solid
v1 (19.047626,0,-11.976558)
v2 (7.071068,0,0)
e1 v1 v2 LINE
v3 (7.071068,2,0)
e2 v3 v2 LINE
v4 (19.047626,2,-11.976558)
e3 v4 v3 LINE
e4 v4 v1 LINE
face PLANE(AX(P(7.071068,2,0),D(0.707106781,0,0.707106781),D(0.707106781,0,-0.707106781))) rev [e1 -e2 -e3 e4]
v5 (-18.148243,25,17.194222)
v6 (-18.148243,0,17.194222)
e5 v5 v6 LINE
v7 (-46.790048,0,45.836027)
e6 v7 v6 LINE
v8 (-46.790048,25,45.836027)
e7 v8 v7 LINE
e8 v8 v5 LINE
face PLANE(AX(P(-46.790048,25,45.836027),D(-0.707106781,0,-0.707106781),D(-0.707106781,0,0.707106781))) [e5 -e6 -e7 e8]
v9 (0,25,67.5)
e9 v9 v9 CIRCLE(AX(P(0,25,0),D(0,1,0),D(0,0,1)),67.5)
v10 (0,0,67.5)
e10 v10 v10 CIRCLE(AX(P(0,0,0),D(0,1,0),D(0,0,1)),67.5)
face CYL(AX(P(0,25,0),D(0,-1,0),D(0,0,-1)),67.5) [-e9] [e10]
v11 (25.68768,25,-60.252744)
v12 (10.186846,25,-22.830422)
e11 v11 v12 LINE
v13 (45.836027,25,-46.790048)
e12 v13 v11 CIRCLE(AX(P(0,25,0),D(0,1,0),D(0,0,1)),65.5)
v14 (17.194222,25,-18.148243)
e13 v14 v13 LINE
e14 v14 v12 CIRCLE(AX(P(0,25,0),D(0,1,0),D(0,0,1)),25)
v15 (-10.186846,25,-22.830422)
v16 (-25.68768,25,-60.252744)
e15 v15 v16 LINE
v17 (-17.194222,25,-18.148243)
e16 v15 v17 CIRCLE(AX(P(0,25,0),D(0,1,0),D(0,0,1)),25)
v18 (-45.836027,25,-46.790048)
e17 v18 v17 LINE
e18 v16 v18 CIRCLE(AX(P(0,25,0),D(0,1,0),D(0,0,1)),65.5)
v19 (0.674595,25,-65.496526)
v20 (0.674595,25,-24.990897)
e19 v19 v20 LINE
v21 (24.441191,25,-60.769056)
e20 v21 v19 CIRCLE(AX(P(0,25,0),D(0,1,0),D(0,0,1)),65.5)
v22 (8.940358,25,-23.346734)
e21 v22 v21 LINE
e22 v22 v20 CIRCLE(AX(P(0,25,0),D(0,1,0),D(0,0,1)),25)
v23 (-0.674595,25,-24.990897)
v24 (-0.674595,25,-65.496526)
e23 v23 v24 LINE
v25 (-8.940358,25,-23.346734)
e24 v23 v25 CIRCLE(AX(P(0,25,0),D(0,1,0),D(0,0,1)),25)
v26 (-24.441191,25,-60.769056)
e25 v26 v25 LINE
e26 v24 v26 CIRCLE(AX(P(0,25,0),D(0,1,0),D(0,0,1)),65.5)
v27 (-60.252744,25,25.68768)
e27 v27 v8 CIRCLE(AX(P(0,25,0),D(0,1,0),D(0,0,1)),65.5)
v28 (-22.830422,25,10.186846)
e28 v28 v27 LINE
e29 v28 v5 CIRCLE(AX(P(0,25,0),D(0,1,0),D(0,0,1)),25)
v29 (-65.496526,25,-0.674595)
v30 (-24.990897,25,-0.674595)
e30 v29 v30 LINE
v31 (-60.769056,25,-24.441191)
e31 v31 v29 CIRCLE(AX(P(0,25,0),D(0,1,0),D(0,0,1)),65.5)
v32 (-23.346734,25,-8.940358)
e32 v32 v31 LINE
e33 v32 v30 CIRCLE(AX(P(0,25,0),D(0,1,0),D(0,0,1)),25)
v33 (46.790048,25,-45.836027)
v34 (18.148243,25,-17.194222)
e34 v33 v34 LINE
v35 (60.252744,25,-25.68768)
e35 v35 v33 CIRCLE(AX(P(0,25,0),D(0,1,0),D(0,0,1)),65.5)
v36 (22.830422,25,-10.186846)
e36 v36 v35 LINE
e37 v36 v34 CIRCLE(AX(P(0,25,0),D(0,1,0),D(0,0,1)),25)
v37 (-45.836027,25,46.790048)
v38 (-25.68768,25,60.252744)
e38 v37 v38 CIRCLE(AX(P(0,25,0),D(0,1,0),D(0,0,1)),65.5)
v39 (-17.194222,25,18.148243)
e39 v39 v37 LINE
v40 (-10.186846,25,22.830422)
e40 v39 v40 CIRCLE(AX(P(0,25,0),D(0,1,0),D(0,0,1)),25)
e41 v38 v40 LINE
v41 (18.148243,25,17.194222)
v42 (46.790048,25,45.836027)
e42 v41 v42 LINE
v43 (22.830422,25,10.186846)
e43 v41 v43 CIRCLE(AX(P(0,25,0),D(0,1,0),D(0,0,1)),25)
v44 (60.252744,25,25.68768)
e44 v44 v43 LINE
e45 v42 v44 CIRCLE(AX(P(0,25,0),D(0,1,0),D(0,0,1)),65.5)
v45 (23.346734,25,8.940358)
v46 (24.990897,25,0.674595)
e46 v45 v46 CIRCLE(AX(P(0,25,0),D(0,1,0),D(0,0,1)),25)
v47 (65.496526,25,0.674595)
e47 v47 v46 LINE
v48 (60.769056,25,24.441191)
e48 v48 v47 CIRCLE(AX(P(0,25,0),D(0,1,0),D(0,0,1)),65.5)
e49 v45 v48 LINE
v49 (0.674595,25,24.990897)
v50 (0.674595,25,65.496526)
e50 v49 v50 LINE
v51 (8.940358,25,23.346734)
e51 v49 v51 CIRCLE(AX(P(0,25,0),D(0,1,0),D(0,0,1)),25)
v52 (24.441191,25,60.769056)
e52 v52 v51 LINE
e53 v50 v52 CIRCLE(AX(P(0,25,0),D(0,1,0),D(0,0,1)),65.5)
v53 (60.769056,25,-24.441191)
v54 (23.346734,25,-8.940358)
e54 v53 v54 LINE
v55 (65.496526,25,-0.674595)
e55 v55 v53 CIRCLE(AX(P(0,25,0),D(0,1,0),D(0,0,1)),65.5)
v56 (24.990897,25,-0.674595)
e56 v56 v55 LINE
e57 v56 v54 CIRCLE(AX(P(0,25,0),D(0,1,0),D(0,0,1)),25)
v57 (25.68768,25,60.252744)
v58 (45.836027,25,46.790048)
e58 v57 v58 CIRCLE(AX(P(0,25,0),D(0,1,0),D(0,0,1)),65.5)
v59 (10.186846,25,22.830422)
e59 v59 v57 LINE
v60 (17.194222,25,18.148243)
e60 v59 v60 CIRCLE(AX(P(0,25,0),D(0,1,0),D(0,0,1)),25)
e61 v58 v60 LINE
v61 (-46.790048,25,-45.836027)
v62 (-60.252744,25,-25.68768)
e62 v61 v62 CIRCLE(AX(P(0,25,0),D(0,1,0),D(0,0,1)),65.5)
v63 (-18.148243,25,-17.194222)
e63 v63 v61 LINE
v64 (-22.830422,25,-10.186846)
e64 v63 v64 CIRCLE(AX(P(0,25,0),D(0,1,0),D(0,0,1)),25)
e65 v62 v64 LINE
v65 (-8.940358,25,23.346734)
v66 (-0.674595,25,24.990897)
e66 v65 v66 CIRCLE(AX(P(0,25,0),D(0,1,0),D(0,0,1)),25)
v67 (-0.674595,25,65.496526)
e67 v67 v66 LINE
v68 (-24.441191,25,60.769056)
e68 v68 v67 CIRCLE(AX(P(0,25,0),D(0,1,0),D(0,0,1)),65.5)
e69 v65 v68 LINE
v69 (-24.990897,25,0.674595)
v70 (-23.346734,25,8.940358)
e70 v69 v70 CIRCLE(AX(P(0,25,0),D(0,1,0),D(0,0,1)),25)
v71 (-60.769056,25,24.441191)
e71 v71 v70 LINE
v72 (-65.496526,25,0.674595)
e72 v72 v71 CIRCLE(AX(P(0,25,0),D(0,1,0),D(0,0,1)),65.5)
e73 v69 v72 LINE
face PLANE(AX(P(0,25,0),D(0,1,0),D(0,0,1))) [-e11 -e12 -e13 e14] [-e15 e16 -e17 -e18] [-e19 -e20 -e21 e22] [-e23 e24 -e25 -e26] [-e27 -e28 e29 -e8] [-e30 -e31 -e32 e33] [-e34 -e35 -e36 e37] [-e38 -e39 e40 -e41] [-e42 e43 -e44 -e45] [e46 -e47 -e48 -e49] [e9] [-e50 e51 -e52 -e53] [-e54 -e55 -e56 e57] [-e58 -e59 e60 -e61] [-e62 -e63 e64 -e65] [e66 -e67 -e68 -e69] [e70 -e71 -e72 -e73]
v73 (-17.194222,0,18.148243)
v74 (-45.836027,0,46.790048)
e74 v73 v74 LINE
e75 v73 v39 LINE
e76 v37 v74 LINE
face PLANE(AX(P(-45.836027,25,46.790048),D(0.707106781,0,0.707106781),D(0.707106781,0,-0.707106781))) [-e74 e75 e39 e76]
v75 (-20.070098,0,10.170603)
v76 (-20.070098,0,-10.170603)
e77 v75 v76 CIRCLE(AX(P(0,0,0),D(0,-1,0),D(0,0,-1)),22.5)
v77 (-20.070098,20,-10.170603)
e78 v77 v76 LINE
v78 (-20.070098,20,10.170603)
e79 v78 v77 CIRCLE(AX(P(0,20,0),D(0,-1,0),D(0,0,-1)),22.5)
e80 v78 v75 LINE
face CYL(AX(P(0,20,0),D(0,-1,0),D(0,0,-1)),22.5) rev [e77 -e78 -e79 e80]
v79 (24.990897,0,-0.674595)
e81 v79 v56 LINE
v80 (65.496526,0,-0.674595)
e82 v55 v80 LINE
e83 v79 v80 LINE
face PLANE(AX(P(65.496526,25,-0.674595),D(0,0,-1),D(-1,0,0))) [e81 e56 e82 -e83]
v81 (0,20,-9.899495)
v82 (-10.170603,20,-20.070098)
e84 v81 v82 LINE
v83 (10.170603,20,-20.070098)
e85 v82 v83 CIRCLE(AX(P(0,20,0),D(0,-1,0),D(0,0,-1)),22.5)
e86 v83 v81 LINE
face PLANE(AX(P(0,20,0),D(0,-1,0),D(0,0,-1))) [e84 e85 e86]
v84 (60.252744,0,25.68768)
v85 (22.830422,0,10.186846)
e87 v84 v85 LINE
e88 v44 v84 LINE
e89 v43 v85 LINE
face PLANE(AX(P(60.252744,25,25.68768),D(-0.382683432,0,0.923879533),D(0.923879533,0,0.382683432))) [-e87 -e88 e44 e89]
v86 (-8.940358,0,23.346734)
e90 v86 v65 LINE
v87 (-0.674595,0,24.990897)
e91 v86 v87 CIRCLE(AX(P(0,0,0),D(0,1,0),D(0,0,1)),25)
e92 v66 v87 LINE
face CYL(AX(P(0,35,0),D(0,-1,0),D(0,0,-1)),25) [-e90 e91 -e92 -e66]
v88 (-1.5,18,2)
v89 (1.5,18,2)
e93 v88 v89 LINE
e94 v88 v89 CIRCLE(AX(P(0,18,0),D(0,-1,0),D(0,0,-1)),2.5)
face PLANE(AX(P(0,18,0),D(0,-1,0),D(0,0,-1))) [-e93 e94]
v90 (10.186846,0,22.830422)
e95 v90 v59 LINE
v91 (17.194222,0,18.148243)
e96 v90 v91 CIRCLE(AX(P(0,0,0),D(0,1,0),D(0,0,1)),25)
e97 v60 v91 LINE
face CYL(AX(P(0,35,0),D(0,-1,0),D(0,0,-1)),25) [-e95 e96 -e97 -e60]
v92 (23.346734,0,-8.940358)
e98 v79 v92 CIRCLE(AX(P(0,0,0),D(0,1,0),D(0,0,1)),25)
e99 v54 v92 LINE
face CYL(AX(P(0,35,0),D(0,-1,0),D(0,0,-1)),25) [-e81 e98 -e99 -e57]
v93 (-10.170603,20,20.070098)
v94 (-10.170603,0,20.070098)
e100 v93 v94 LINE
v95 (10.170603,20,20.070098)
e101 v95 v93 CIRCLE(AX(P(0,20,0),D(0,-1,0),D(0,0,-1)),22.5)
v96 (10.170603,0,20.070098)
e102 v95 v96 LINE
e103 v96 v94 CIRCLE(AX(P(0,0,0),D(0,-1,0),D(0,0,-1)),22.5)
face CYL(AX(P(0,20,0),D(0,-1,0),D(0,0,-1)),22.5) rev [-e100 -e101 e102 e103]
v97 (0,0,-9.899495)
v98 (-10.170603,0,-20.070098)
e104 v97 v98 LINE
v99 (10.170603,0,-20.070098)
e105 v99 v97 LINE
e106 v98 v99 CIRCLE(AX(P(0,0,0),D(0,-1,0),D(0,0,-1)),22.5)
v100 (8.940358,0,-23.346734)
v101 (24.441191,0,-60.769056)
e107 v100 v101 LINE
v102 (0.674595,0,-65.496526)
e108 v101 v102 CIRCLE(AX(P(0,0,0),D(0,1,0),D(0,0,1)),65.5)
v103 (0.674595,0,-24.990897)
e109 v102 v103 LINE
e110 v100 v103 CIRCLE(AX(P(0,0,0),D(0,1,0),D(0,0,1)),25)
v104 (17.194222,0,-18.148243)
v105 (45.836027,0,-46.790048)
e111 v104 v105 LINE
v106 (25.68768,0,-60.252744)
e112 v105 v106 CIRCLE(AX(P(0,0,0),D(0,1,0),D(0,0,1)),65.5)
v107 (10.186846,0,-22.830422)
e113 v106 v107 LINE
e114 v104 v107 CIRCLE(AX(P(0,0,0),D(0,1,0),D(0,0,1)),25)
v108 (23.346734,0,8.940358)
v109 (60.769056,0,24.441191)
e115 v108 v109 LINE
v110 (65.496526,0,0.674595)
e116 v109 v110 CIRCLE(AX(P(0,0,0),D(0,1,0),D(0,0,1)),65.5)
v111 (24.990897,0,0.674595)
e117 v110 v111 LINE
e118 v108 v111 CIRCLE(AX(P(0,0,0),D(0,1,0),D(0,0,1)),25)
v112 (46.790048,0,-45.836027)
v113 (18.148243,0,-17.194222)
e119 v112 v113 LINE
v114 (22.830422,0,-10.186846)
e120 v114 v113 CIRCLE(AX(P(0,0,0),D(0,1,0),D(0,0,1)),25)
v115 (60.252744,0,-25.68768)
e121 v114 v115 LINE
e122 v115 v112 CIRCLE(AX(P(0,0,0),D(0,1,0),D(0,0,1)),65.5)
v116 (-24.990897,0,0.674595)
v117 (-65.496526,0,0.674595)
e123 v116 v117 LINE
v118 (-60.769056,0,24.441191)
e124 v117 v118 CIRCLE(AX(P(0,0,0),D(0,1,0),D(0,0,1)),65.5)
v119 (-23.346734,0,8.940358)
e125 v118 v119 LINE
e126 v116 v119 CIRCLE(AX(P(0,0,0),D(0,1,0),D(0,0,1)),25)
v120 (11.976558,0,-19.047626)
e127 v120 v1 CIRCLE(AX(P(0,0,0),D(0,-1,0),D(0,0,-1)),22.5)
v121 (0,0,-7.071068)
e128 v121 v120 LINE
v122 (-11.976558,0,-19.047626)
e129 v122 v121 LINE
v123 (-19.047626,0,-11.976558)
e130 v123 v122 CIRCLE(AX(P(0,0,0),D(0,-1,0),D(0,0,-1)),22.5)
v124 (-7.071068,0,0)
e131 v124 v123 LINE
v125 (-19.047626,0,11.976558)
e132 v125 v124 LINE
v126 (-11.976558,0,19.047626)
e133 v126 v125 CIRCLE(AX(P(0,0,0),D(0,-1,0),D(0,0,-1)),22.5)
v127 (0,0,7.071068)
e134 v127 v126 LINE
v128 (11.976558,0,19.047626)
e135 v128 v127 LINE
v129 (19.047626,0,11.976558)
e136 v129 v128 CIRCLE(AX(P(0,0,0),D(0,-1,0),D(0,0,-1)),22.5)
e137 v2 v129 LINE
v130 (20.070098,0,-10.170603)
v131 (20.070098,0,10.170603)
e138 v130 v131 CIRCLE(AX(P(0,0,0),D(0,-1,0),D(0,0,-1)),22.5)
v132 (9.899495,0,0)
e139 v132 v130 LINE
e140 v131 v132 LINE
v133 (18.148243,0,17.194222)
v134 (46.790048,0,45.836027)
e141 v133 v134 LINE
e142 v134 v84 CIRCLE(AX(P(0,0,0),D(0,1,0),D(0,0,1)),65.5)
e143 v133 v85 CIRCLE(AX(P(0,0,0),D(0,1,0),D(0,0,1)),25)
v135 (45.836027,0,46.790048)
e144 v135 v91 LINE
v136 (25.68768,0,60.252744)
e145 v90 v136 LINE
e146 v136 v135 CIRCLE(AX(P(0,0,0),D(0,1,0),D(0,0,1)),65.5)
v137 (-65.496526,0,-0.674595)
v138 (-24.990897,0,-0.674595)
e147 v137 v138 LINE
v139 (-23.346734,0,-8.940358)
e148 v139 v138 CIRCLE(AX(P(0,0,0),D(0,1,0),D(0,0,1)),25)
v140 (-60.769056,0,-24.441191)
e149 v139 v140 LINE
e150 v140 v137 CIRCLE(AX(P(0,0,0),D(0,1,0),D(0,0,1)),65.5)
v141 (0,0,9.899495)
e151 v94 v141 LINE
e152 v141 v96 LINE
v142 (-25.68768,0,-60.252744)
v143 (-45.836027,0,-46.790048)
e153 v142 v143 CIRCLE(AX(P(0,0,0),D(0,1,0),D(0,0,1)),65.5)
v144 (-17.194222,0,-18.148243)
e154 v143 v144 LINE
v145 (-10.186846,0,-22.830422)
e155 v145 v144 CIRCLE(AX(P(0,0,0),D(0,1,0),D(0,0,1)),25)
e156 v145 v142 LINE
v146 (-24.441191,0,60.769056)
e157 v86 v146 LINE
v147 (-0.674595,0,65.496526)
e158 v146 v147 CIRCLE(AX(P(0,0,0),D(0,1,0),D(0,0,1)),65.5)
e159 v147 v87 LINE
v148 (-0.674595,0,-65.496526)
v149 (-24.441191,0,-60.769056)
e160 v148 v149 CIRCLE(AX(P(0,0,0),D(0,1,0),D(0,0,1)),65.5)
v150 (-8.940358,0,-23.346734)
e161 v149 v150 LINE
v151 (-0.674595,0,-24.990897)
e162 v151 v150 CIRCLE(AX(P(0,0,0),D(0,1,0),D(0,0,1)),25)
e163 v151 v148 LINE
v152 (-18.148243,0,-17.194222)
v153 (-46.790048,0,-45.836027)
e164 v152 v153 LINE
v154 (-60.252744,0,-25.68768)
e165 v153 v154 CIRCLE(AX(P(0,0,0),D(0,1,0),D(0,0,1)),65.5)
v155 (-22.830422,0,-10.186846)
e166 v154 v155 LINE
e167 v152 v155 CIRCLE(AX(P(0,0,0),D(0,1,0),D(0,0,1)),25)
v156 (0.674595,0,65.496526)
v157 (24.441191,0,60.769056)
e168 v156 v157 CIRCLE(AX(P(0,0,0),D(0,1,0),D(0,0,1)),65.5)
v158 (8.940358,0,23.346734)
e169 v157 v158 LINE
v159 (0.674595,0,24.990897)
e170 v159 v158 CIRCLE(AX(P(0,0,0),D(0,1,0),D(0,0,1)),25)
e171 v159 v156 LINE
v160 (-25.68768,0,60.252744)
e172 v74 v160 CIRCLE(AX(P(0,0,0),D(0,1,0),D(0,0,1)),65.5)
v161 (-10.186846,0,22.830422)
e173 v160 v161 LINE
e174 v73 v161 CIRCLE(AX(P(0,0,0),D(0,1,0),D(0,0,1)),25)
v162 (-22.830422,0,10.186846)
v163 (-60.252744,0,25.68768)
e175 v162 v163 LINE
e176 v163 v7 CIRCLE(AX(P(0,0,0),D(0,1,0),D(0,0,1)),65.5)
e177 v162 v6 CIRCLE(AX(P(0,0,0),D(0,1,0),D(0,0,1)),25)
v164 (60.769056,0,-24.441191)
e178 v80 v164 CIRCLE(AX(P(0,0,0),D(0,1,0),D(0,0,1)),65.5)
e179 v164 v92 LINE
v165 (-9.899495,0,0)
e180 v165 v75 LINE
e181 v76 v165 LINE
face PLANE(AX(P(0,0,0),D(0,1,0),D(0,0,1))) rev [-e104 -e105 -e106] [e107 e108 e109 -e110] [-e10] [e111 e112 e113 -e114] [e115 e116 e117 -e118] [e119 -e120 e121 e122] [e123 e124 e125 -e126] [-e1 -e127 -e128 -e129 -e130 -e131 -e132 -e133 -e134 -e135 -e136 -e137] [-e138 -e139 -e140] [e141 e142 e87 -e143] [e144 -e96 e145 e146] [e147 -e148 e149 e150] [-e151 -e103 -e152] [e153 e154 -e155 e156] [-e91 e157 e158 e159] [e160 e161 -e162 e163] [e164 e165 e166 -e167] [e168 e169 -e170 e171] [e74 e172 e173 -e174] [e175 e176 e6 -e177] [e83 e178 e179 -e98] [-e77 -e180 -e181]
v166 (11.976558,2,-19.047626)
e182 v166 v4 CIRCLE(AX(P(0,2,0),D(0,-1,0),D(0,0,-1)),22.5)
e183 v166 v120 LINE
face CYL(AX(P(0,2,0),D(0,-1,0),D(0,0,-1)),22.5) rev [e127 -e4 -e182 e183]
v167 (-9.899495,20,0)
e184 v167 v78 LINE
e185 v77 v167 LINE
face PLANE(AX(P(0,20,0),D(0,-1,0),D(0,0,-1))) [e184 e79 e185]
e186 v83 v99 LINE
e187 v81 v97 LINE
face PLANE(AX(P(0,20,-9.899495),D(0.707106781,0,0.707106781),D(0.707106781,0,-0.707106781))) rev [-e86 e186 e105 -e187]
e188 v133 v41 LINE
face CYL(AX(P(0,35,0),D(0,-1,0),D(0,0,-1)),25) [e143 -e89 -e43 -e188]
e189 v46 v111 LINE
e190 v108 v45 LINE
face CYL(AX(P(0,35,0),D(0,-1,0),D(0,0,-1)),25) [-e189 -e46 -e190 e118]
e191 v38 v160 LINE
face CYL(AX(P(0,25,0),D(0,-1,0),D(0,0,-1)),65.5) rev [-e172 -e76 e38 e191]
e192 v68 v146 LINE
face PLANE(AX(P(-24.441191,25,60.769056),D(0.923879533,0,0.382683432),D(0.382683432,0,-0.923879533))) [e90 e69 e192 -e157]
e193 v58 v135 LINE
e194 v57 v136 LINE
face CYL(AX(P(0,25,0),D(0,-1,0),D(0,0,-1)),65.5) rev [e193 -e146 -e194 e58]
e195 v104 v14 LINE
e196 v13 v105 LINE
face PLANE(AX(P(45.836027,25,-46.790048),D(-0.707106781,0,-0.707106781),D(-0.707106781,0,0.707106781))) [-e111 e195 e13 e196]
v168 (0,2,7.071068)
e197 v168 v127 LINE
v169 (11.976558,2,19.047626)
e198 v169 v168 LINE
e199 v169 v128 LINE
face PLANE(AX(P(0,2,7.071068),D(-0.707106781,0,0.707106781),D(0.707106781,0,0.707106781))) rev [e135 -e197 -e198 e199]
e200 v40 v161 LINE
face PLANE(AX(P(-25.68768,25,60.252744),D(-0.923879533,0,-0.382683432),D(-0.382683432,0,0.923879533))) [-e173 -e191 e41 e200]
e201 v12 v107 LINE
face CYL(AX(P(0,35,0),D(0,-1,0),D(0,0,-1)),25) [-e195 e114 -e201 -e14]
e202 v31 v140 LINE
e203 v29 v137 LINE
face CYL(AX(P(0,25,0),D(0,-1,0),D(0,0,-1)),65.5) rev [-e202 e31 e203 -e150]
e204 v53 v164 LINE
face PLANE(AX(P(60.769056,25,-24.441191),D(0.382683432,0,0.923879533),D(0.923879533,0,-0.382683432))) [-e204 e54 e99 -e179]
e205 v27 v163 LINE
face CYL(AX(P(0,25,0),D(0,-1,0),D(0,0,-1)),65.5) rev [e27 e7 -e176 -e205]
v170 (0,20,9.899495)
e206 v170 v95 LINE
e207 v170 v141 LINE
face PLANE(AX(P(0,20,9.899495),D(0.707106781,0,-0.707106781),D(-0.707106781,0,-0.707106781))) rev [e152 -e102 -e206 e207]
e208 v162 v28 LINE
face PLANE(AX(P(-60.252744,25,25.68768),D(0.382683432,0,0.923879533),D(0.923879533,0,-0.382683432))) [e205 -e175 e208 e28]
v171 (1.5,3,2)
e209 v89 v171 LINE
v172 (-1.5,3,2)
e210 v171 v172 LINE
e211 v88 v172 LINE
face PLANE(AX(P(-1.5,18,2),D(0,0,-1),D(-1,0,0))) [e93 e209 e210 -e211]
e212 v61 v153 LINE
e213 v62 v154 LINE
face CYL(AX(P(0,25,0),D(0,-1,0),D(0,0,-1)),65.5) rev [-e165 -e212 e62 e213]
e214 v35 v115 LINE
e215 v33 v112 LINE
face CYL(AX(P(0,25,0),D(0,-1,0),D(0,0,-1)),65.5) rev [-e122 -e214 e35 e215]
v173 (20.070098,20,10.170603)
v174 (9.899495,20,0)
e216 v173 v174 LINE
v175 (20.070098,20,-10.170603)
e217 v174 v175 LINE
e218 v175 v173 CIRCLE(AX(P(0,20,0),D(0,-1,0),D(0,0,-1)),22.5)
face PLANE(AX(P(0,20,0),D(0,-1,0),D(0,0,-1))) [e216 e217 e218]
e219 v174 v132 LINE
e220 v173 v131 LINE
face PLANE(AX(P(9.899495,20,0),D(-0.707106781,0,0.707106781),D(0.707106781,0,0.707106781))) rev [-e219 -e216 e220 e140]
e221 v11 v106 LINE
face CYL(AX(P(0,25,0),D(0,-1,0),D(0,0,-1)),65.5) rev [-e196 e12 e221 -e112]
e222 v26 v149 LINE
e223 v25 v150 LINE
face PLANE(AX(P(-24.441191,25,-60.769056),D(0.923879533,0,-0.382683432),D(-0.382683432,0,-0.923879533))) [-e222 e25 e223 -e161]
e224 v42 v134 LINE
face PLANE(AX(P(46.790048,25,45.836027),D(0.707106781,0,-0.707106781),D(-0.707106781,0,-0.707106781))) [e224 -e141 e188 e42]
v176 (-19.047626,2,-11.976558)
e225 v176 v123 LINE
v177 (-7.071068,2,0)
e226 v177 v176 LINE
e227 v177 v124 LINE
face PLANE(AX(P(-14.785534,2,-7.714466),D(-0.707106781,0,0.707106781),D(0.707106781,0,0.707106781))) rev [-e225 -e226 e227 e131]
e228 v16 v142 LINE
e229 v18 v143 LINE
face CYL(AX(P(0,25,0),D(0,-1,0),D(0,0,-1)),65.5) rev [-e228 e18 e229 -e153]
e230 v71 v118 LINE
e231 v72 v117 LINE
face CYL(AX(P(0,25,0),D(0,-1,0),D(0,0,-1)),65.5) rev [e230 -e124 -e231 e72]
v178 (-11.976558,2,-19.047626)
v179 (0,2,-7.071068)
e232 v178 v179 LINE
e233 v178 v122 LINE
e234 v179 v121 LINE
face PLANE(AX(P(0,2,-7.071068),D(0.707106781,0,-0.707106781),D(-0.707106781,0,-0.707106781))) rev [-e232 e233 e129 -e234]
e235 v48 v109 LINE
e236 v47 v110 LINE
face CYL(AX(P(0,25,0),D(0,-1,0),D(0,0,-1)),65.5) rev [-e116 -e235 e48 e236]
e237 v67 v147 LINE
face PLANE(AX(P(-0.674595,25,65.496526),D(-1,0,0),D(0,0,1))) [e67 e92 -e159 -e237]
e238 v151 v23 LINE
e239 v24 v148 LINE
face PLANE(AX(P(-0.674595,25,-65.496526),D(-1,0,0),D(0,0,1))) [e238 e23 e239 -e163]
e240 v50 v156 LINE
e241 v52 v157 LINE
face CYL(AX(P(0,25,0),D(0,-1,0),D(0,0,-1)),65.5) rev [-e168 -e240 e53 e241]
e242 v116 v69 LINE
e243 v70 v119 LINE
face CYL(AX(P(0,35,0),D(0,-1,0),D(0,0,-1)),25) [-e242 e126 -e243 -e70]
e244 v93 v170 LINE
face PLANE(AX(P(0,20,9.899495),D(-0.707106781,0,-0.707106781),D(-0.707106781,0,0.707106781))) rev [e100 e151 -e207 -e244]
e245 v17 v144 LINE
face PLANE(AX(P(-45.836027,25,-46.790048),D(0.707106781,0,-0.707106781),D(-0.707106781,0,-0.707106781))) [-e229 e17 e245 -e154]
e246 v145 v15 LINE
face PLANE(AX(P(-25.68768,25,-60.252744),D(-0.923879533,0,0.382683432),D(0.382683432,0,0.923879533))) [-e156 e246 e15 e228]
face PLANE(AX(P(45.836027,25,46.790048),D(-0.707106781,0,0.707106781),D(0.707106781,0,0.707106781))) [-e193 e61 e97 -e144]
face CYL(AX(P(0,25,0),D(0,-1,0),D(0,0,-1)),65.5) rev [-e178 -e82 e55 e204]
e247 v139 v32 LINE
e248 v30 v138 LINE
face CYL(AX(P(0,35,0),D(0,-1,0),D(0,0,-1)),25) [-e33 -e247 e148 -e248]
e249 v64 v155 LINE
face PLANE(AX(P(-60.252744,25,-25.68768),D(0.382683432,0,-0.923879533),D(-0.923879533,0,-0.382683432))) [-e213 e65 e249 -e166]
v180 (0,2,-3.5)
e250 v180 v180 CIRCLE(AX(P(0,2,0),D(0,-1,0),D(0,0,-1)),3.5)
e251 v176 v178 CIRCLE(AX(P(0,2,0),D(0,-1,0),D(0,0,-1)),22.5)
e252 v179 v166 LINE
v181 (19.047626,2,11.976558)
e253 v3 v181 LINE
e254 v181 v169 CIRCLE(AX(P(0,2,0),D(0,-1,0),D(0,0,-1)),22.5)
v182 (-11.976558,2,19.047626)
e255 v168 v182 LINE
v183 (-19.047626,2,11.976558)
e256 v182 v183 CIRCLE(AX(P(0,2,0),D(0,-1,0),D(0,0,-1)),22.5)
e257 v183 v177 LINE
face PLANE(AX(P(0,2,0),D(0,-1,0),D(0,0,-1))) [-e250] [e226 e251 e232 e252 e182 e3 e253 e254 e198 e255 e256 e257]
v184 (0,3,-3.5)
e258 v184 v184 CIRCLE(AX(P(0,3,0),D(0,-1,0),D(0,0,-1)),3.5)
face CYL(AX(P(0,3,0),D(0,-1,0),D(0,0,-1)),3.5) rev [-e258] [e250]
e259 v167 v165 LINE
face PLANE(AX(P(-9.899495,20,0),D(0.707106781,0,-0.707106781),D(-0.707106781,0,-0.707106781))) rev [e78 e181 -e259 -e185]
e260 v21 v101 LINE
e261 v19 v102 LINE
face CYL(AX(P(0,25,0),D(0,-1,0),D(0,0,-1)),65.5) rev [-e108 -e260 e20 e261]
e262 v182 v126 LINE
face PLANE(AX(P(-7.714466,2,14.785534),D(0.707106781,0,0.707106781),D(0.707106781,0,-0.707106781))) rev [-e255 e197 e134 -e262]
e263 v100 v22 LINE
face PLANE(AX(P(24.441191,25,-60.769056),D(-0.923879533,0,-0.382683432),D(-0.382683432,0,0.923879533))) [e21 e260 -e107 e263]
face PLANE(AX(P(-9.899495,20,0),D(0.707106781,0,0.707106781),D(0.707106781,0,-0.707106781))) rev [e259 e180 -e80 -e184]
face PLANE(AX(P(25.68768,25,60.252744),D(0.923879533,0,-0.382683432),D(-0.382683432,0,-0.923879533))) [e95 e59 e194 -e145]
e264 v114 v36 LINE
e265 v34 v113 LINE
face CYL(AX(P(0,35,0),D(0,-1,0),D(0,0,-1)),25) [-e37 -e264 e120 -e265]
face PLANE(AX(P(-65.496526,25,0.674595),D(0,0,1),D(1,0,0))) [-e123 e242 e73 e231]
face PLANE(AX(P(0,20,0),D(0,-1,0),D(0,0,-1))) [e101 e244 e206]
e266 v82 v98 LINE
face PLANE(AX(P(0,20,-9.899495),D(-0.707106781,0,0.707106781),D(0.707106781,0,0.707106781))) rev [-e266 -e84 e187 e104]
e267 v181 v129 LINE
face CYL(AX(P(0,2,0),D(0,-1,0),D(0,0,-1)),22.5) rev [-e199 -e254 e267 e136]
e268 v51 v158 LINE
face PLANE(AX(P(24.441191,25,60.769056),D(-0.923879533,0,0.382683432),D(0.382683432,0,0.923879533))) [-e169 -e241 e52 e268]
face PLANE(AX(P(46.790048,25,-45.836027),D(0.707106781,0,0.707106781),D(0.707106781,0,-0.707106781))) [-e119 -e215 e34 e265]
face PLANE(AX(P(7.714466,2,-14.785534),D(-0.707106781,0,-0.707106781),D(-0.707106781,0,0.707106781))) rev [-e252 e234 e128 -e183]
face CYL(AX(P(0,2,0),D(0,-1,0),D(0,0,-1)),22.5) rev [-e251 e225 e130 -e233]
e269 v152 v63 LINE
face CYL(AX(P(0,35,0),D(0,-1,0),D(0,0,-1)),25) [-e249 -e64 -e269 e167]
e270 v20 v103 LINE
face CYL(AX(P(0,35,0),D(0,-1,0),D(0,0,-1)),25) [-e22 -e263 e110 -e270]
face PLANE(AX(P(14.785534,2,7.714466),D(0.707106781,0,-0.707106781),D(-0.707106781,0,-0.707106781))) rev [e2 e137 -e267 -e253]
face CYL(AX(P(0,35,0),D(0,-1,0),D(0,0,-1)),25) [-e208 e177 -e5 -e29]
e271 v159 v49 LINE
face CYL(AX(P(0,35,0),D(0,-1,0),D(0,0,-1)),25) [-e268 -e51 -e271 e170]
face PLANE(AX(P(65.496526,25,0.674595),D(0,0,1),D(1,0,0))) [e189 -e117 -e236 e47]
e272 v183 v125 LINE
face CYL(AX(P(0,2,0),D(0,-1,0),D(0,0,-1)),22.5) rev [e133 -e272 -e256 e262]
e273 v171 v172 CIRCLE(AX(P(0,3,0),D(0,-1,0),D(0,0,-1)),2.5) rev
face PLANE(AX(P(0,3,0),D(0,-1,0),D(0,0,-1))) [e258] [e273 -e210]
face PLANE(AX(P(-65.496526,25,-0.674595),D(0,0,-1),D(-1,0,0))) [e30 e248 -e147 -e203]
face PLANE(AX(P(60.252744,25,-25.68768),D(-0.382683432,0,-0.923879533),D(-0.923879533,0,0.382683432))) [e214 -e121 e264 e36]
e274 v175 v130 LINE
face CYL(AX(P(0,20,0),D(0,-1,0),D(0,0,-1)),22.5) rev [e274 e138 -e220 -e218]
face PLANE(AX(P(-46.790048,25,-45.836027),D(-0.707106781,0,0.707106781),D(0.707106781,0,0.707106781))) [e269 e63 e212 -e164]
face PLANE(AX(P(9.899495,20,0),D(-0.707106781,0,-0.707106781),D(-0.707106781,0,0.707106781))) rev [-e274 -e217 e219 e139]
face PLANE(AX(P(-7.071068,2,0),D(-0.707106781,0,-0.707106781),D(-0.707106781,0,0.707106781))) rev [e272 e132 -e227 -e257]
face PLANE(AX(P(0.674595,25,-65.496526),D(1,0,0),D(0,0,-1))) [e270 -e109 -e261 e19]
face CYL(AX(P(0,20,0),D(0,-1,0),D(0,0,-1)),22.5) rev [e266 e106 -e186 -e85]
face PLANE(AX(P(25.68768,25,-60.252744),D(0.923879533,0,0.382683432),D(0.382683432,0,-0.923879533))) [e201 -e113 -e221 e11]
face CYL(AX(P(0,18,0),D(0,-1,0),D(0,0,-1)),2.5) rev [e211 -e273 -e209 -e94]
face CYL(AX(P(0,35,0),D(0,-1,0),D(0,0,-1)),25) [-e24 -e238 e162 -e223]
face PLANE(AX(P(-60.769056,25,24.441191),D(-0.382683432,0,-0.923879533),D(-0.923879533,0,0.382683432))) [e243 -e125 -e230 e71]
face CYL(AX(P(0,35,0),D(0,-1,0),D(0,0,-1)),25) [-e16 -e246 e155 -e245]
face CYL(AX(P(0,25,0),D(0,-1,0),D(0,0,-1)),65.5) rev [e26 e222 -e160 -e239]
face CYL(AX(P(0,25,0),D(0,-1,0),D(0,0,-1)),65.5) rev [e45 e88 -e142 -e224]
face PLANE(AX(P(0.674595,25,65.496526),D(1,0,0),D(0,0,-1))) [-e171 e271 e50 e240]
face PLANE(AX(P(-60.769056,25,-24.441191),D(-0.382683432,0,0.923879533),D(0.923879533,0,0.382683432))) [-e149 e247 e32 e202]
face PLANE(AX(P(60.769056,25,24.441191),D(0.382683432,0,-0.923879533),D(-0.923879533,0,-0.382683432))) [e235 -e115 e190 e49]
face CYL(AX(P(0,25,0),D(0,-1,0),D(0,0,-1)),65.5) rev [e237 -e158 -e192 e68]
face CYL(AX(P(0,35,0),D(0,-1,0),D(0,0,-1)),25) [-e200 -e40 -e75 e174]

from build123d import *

# Parameters (mm, degrees)
BOSS_EXTRUDE1_OUTLINE_R = 67.5
BOSS_EXTRUDE1_DEPTH     = 25
SKETCH2_R               = 2.5
CUT_EXTRUDE2_DEPTH      = 18
SKETCH4_R               = 25
BOSS_EXTRUDE3_DEPTH     = 35
CUT_EXTRUDE4_DEPTH      = 18
CUT_EXTRUDE7_DEPTH      = 2
CUT_EXTRUDE8_DEPTH      = 20
SKETCH9_R               = 3.5
CUT_EXTRUDE9_DEPTH      = 1
CUT_EXTRUDE10_START     = -10
SKETCH10_R              = 25
CUT_EXTRUDE10_DEPTH     = 10


# Read off the part's stored shape, not the designer's step: Boss-Extrude1
with BuildPart() as part:
    # Boss-Extrude1 outline → Boss-Extrude1 (new body)
    with BuildSketch(Plane(origin=(0, 0, 0), x_dir=(1, 0, 0), z_dir=(0, 1, 0))):
        Circle(BOSS_EXTRUDE1_OUTLINE_R)
        with BuildLine():
            ThreePointArc((-13.30331837, -14.257339175), (-10.833619544, -16.21365744), (-8.081104316, -17.746711048))
            Line((-8.081104316, -17.746711048), (-25.687679516, -60.252743681))
            ThreePointArc((-25.687679516, -60.252743681), (-36.389850263, -54.461259606), (-45.836027298, -46.790048103))
            Line((-45.836027298, -46.790048103), (-13.30331837, -14.257339175))
        make_face(mode=Mode.SUBTRACT)
        with BuildLine():
            ThreePointArc((-6.834616064, -18.263023388), (-3.804261279, -19.125312968), (-0.674594581, -19.488327844))
            Line((-0.674594581, -19.488327844), (-0.674594581, -65.496526031))
            ThreePointArc((-0.674594581, -65.496526031), (-12.778416092, -64.241435866), (-24.441191264, -60.76905602))
            Line((-24.441191264, -60.76905602), (-6.834616064, -18.263023388))
        make_face(mode=Mode.SUBTRACT)
        with BuildLine():
            ThreePointArc((-17.746711048, -8.081104316), (-16.21365744, -10.833619544), (-14.257339175, -13.30331837))
            Line((-14.257339175, -13.30331837), (-46.790048103, -45.836027298))
            ThreePointArc((-46.790048103, -45.836027298), (-54.461259606, -36.389850263), (-60.252743681, -25.687679516))
            Line((-60.252743681, -25.687679516), (-17.746711048, -8.081104316))
        make_face(mode=Mode.SUBTRACT)
        with BuildLine():
            ThreePointArc((-19.488327844, -0.674594581), (-19.125312968, -3.804261279), (-18.263023388, -6.834616064))
            Line((-18.263023388, -6.834616064), (-60.76905602, -24.441191264))
            ThreePointArc((-60.76905602, -24.441191264), (-64.241435866, -12.778416092), (-65.496526031, -0.674594581))
            Line((-65.496526031, -0.674594581), (-19.488327844, -0.674594581))
        make_face(mode=Mode.SUBTRACT)
        with BuildLine():
            ThreePointArc((0.674594581, -19.488327844), (3.804261279, -19.125312968), (6.834616064, -18.263023388))
            Line((6.834616064, -18.263023388), (24.441191264, -60.76905602))
            ThreePointArc((24.441191264, -60.76905602), (12.778416092, -64.241435866), (0.674594581, -65.496526031))
            Line((0.674594581, -65.496526031), (0.674594581, -19.488327844))
        make_face(mode=Mode.SUBTRACT)
        with BuildLine():
            ThreePointArc((8.081104316, -17.746711048), (10.833619544, -16.21365744), (13.30331837, -14.257339175))
            Line((13.30331837, -14.257339175), (45.836027298, -46.790048103))
            ThreePointArc((45.836027298, -46.790048103), (36.389850263, -54.461259606), (25.687679516, -60.252743681))
            Line((25.687679516, -60.252743681), (8.081104316, -17.746711048))
        make_face(mode=Mode.SUBTRACT)
        with BuildLine():
            ThreePointArc((14.257339175, -13.30331837), (16.21365744, -10.833619544), (17.746711048, -8.081104316))
            Line((17.746711048, -8.081104316), (60.252743681, -25.687679516))
            ThreePointArc((60.252743681, -25.687679516), (54.461259606, -36.389850263), (46.790048103, -45.836027298))
            Line((46.790048103, -45.836027298), (14.257339175, -13.30331837))
        make_face(mode=Mode.SUBTRACT)
        with BuildLine():
            ThreePointArc((18.263023388, -6.834616064), (19.125312968, -3.804261279), (19.488327844, -0.674594581))
            Line((19.488327844, -0.674594581), (65.496526031, -0.674594581))
            ThreePointArc((65.496526031, -0.674594581), (64.241435866, -12.778416092), (60.76905602, -24.441191264))
            Line((60.76905602, -24.441191264), (18.263023388, -6.834616064))
        make_face(mode=Mode.SUBTRACT)
        with BuildLine():
            ThreePointArc((-18.263023388, 6.834616064), (-19.125312968, 3.804261279), (-19.488327844, 0.674594581))
            Line((-19.488327844, 0.674594581), (-65.496526031, 0.674594581))
            ThreePointArc((-65.496526031, 0.674594581), (-64.241435866, 12.778416092), (-60.76905602, 24.441191264))
            Line((-60.76905602, 24.441191264), (-18.263023388, 6.834616064))
        make_face(mode=Mode.SUBTRACT)
        with BuildLine():
            ThreePointArc((-14.257339175, 13.30331837), (-16.21365744, 10.833619544), (-17.746711048, 8.081104316))
            Line((-17.746711048, 8.081104316), (-60.252743681, 25.687679516))
            ThreePointArc((-60.252743681, 25.687679516), (-54.461259606, 36.389850263), (-46.790048103, 45.836027298))
            Line((-46.790048103, 45.836027298), (-14.257339175, 13.30331837))
        make_face(mode=Mode.SUBTRACT)
        with BuildLine():
            ThreePointArc((-8.081104316, 17.746711048), (-10.833619544, 16.21365744), (-13.30331837, 14.257339175))
            Line((-13.30331837, 14.257339175), (-45.836027298, 46.790048103))
            ThreePointArc((-45.836027298, 46.790048103), (-36.389850263, 54.461259606), (-25.687679516, 60.252743681))
            Line((-25.687679516, 60.252743681), (-8.081104316, 17.746711048))
        make_face(mode=Mode.SUBTRACT)
        with BuildLine():
            Line((-6.834616064, 18.263023388), (-24.441191264, 60.76905602))
            ThreePointArc((-24.441191264, 60.76905602), (-12.778416092, 64.241435866), (-0.674594581, 65.496526031))
            Line((-0.674594581, 65.496526031), (-0.674594581, 19.488327844))
            ThreePointArc((-0.674594581, 19.488327844), (-3.804261279, 19.125312968), (-6.834616064, 18.263023388))
        make_face(mode=Mode.SUBTRACT)
        with BuildLine():
            ThreePointArc((19.488327844, 0.674594581), (19.125312968, 3.804261279), (18.263023388, 6.834616064))
            Line((18.263023388, 6.834616064), (60.76905602, 24.441191264))
            ThreePointArc((60.76905602, 24.441191264), (64.241435866, 12.778416092), (65.496526031, 0.674594581))
            Line((65.496526031, 0.674594581), (19.488327844, 0.674594581))
        make_face(mode=Mode.SUBTRACT)
        with BuildLine():
            ThreePointArc((17.746711048, 8.081104316), (16.21365744, 10.833619544), (14.257339175, 13.30331837))
            Line((14.257339175, 13.30331837), (46.790048103, 45.836027298))
            ThreePointArc((46.790048103, 45.836027298), (54.461259606, 36.389850263), (60.252743681, 25.687679516))
            Line((60.252743681, 25.687679516), (17.746711048, 8.081104316))
        make_face(mode=Mode.SUBTRACT)
        with BuildLine():
            ThreePointArc((6.834616064, 18.263023388), (3.804261279, 19.125312968), (0.674594581, 19.488327844))
            Line((0.674594581, 19.488327844), (0.674594581, 65.496526031))
            ThreePointArc((0.674594581, 65.496526031), (12.778416092, 64.241435866), (24.441191264, 60.76905602))
            Line((24.441191264, 60.76905602), (6.834616064, 18.263023388))
        make_face(mode=Mode.SUBTRACT)
        with BuildLine():
            ThreePointArc((13.30331837, 14.257339175), (10.833619544, 16.21365744), (8.081104316, 17.746711048))
            Line((8.081104316, 17.746711048), (25.687679516, 60.252743681))
            ThreePointArc((25.687679516, 60.252743681), (36.389850263, 54.461259606), (45.836027298, 46.790048103))
            Line((45.836027298, 46.790048103), (13.30331837, 14.257339175))
        make_face(mode=Mode.SUBTRACT)
    extrude(amount=BOSS_EXTRUDE1_DEPTH)

    # Sketch2 → Cut-Extrude2 (cut)
    with BuildSketch(Plane.XZ):
        with Locations(Location((0, 0, 0), (0, 0, 270))):
            Circle(SKETCH2_R)
    extrude(amount=-CUT_EXTRUDE2_DEPTH, mode=Mode.SUBTRACT)

    # Sketch4 → Boss-Extrude3 (add)
    with BuildSketch(Plane(origin=(0, 0, 0), x_dir=(1, 0, 0), z_dir=(0, 1, 0))):
        with Locations(Location((0, 0, 0), (0, 0, 91.546244576))):
            Circle(SKETCH4_R)
    extrude(amount=BOSS_EXTRUDE3_DEPTH)

    # Sketch5 → Cut-Extrude4 (cut)
    with BuildSketch(Plane.XZ):
        with BuildLine():
            Line((-1.5, 2), (1.5, 2))
            ThreePointArc((1.5, 2), (0, -2.5), (-1.5, 2))
        make_face()
    extrude(amount=-CUT_EXTRUDE4_DEPTH, mode=Mode.SUBTRACT)

    # Sketch6 → Cut-Extrude7 (cut)
    with BuildSketch(Plane.XZ):
        with BuildLine():
            Line((-7.714466094, 14.785533906), (0, 7.071067812))
            Line((0, 7.071067812), (7.714466094, 14.785533906))
            Line((7.714466094, 14.785533906), (11.976558152, 19.047625963))
            ThreePointArc((11.976558152, 19.047625963), (15.909902577, 15.909902577), (19.047625963, 11.976558152))
            Line((19.047625963, 11.976558152), (14.785533906, 7.714466094))
            Line((14.785533906, 7.714466094), (7.071067812, 0))
            Line((7.071067812, 0), (14.785533906, -7.714466094))
            Line((14.785533906, -7.714466094), (19.047625963, -11.976558152))
            ThreePointArc((19.047625963, -11.976558152), (15.909902577, -15.909902577), (11.976558152, -19.047625963))
            Line((11.976558152, -19.047625963), (7.714466094, -14.785533906))
            Line((7.714466094, -14.785533906), (0, -7.071067812))
            Line((0, -7.071067812), (-7.714466094, -14.785533906))
            Line((-7.714466094, -14.785533906), (-11.976558152, -19.047625963))
            ThreePointArc((-11.976558152, -19.047625963), (-15.909902577, -15.909902577), (-19.047625963, -11.976558152))
            Line((-19.047625963, -11.976558152), (-14.785533906, -7.714466094))
            Line((-14.785533906, -7.714466094), (-7.071067812, 0))
            Line((-7.071067812, 0), (-14.785533906, 7.714466094))
            Line((-14.785533906, 7.714466094), (-19.047625963, 11.976558152))
            ThreePointArc((-19.047625963, 11.976558152), (-15.909902577, 15.909902577), (-11.976558152, 19.047625963))
            Line((-11.976558152, 19.047625963), (-7.714466094, 14.785533906))
        make_face()
    extrude(amount=-CUT_EXTRUDE7_DEPTH, mode=Mode.SUBTRACT)

    # Sketch7 → Cut-Extrude8 (cut)
    with BuildSketch(Plane.XZ):
        with BuildLine():
            Line((9.899494937, 0), (20.070097993, 10.170603057))
            ThreePointArc((20.070097993, 10.170603057), (22.5, 0), (20.070097993, -10.170603057))
            Line((20.070097993, -10.170603057), (9.899494937, 0))
        make_face()
        with BuildLine():
            Line((0, 9.899494937), (-10.170603057, 20.070097993))
            ThreePointArc((-10.170603057, 20.070097993), (0, 22.5), (10.170603057, 20.070097993))
            Line((10.170603057, 20.070097993), (0, 9.899494937))
        make_face()
        with BuildLine():
            Line((0, -9.899494937), (10.170603057, -20.070097993))
            ThreePointArc((10.170603057, -20.070097993), (0, -22.5), (-10.170603057, -20.070097993))
            Line((-10.170603057, -20.070097993), (0, -9.899494937))
        make_face()
        with BuildLine():
            Line((-9.899494937, 0), (-20.070097993, -10.170603057))
            ThreePointArc((-20.070097993, -10.170603057), (-22.5, 0), (-20.070097993, 10.170603057))
            Line((-20.070097993, 10.170603057), (-9.899494937, 0))
        make_face()
    extrude(amount=-CUT_EXTRUDE8_DEPTH, mode=Mode.SUBTRACT)

    # Sketch9 → Cut-Extrude9 (cut)
    with BuildSketch(Plane(origin=(0, 2, 0), x_dir=(-1, 0, 0), z_dir=(0, -1, 0))):
        with Locations(Location((0, 0, 0), (0, 0, 90))):
            Circle(SKETCH9_R)
    extrude(amount=-CUT_EXTRUDE9_DEPTH, mode=Mode.SUBTRACT)

    # Sketch10 → Cut-Extrude10 (cut)
    with BuildSketch(Plane(origin=(0, 35, 0), x_dir=(1, 0, 0), z_dir=(0, 1, 0)).offset(CUT_EXTRUDE10_START)):
        Circle(SKETCH10_R)
    extrude(amount=CUT_EXTRUDE10_DEPTH, mode=Mode.SUBTRACT)


solid = part.part
